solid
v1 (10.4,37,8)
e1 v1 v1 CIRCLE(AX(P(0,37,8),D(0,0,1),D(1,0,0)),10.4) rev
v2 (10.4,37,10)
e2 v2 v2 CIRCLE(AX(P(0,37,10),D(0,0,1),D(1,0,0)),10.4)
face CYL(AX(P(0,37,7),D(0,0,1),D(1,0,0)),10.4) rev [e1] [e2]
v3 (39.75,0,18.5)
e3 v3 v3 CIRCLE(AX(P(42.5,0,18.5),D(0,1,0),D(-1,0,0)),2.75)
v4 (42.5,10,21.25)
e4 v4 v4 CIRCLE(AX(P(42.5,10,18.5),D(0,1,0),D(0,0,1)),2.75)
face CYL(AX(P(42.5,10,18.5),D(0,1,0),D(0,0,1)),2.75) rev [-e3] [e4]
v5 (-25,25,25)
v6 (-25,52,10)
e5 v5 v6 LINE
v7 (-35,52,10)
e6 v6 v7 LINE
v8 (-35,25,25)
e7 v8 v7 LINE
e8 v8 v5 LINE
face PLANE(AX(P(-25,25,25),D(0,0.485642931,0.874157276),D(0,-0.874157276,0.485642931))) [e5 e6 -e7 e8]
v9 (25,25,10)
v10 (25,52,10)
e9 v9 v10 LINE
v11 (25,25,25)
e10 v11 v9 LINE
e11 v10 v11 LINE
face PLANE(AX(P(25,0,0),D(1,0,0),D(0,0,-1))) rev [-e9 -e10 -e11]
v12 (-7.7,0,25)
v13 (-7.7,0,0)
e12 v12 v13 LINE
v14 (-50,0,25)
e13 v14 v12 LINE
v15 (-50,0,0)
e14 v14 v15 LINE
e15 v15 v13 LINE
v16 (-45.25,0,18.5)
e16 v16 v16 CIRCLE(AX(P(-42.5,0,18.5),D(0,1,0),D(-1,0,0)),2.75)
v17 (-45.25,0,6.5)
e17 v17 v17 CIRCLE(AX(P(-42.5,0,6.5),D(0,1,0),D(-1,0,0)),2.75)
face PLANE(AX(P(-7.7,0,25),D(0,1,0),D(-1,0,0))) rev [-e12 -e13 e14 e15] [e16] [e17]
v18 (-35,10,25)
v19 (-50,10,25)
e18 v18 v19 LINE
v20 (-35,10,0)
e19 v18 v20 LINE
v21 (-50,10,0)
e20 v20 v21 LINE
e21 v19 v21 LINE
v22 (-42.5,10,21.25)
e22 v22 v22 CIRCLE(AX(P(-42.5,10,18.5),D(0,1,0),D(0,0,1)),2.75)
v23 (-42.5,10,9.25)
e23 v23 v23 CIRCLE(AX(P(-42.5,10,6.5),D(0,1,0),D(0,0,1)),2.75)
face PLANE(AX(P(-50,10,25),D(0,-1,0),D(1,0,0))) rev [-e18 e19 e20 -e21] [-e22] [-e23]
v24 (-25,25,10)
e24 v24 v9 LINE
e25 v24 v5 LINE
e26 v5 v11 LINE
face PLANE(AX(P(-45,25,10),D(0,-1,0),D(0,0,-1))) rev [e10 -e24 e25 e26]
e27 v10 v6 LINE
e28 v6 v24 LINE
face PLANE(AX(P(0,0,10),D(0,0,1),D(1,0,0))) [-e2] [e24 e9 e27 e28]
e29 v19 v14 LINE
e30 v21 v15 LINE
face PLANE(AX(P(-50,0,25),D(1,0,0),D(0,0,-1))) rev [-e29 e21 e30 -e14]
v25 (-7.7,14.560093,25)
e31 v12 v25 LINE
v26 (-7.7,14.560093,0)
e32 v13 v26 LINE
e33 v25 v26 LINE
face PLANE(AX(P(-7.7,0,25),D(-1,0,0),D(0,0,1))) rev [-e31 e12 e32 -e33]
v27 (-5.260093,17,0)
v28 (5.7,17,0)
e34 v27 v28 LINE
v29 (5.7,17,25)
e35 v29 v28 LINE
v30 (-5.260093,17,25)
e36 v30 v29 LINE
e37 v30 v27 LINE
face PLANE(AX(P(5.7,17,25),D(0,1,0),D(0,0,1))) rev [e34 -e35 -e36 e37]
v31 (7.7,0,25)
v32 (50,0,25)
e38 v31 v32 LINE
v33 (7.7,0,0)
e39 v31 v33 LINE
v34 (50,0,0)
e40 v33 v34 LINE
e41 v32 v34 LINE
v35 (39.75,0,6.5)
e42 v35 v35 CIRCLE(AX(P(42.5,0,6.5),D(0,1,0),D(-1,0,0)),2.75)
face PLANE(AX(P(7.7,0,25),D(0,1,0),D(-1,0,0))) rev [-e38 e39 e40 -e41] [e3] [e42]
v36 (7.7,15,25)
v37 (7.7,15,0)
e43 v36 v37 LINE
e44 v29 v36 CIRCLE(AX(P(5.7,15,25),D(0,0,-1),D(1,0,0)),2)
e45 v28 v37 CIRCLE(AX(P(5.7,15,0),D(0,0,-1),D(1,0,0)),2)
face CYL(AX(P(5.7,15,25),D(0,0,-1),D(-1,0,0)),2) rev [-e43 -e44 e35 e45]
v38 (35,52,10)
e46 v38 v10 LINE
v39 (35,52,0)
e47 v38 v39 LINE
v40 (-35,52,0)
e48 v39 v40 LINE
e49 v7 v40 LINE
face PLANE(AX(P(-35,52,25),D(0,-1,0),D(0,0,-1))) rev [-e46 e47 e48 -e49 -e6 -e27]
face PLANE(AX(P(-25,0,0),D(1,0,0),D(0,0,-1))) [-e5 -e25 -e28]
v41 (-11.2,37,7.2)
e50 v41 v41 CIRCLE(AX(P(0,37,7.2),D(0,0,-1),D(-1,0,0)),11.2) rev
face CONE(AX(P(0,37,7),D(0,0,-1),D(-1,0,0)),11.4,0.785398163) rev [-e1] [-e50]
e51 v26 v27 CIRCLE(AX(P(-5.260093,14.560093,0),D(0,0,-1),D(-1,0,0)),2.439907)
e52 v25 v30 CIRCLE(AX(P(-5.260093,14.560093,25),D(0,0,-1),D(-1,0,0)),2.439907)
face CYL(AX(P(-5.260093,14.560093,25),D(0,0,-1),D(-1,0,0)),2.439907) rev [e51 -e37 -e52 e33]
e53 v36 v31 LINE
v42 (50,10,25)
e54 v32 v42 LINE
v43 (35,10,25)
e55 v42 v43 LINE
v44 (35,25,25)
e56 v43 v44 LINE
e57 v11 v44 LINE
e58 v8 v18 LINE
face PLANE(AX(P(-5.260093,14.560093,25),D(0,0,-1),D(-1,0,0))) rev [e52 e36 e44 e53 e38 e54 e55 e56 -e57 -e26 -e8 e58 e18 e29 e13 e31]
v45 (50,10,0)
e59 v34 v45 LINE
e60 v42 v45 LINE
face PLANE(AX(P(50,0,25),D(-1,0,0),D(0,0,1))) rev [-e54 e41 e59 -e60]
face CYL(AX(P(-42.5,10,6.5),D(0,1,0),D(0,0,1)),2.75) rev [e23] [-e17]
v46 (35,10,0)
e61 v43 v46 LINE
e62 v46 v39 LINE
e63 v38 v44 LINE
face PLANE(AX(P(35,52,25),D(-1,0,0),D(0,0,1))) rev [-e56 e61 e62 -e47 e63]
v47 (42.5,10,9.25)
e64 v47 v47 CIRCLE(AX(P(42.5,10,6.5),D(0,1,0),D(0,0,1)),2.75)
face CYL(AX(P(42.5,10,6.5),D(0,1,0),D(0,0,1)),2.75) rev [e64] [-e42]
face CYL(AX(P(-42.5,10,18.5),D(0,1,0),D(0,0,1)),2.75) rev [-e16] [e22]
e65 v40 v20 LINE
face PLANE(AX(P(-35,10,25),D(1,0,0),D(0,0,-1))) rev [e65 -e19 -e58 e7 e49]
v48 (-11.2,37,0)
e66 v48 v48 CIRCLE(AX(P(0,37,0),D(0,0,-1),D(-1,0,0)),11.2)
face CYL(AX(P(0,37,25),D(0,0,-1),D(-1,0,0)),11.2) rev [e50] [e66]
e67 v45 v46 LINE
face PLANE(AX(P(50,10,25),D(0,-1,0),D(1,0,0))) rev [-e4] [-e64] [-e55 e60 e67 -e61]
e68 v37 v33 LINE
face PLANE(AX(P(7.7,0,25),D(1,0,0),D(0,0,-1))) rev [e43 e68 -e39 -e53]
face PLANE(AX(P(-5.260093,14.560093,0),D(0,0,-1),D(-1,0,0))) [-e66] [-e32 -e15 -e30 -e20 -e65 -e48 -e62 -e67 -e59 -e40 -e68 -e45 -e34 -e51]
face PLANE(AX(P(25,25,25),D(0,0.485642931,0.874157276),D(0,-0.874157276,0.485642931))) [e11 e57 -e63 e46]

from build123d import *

# Parameters (mm, degrees)
BOSS_EXTRUDE1_DEPTH  = 25
SKETCH2_R            = 11.2
CUT_EXTRUDE1_DEPTH   = 77.347887987
SKETCH11_W           = 90
SKETCH11_H           = 30
CUT_EXTRUDE4_DEPTH   = 15
BOSS_EXTRUDE2_DEPTH  = 10
BOSS_EXTRUDE3_DEPTH  = 10
SKETCH14_R           = 11.4
SKETCH14_R_2         = 10.4
BOSS_EXTRUDE4_DEPTH  = 3
CHAMFER1_SIZE        = 1
M5_CLEARANCE_HOLE1_D = 5.5


with BuildPart() as part:
    # Sketch1 → Boss-Extrude1 (new body)
    with BuildSketch(Plane.XY):
        with BuildLine():
            Line((50, 0), (50, 10))
            Line((50, 10), (35, 10))
            Line((35, 10), (35, 52))
            Line((35, 52), (-35, 52))
            Line((-35, 52), (-35, 10))
            Line((-35, 10), (-50, 10))
            Line((-50, 10), (-50, 0))
            Line((-50, 0), (-7.7, 0))
            Line((-7.7, 0), (-7.7, 14.560093328))
            ThreePointArc((-7.7, 14.560093328), (-6.985367881, 16.285367881), (-5.260093328, 17))
            Line((-5.260093328, 17), (5.7, 17))
            ThreePointArc((5.7, 17), (7.114213562, 16.414213562), (7.7, 15))
            Line((7.7, 15), (7.7, 0))
            Line((7.7, 0), (50, 0))
        make_face()
    extrude(amount=BOSS_EXTRUDE1_DEPTH)

    # Sketch2 → Cut-Extrude1 (cut, through all)
    with BuildSketch(Plane(origin=(0, 0, 0), x_dir=(-1, 0, 0), z_dir=(0, 0, -1))):
        with Locations((0, 37)):
            Circle(SKETCH2_R)
    extrude(amount=-CUT_EXTRUDE1_DEPTH, mode=Mode.SUBTRACT)

    # Sketch11 → Cut-Extrude4 (cut)
    with BuildSketch(Plane.XY.offset(25)):
        with Locations((0, 40)):
            Rectangle(SKETCH11_W, SKETCH11_H)
    extrude(amount=-CUT_EXTRUDE4_DEPTH, mode=Mode.SUBTRACT)

    # Sketch12 → Boss-Extrude2 (add)
    with BuildSketch(Plane.ZY.offset(35)):
        Polygon((10, 52), (10, 25), (25, 25), align=None)
    extrude(amount=-BOSS_EXTRUDE2_DEPTH)

    # Sketch13 → Boss-Extrude3 (add)
    with BuildSketch(Plane(origin=(35, 0, 0), x_dir=(0, 0, -1), z_dir=(1, 0, 0))):
        Polygon((-10, 52), (-10, 25), (-25, 25), align=None)
    extrude(amount=-BOSS_EXTRUDE3_DEPTH)

    # Sketch14 → Boss-Extrude4 (add)
    with BuildSketch(Plane.XY.offset(10)):
        with Locations((0, 37)):
            Circle(SKETCH14_R)
        with Locations((0, 37)):
            Circle(SKETCH14_R_2, mode=Mode.SUBTRACT)
    extrude(amount=-BOSS_EXTRUDE4_DEPTH)

    # Chamfer1
    # the kernel refuses this chamfer: 1 mm, written as the material it takes off along each edge
    with BuildSketch(Plane(origin=(0, 37, 7), x_dir=(1, 0, 0), z_dir=(0, -1, 0))) as chamfer1_piece_1_section:
        Polygon((10.4 + CHAMFER1_SIZE, 0), (10.4, CHAMFER1_SIZE), (10.4, 0), align=None)
    chamfer1_piece_1 = revolve(axis=Axis((0, 37, 7), (0, 0, 1)), mode=Mode.PRIVATE)
    chamfer1_piece_1 = chamfer1_piece_1 & Plane(origin=(0, 37, 7.590998704), x_dir=(-1, 0, 0), z_dir=(0, 0, -1)) * Cylinder(11.2, 46, mode=Mode.PRIVATE)
    add(chamfer1_piece_1, mode=Mode.SUBTRACT)

    # M5 Clearance Hole1 (through all)
    with Locations(Plane(origin=(0, 10, 0), x_dir=(1, 0, 0), z_dir=(0, 1, 0))):
        with Locations((42.5, -18.5), (42.5, -6.5), (-42.5, -18.5), (-42.5, -6.5)):
            Hole(M5_CLEARANCE_HOLE1_D / 2)


solid = part.part
